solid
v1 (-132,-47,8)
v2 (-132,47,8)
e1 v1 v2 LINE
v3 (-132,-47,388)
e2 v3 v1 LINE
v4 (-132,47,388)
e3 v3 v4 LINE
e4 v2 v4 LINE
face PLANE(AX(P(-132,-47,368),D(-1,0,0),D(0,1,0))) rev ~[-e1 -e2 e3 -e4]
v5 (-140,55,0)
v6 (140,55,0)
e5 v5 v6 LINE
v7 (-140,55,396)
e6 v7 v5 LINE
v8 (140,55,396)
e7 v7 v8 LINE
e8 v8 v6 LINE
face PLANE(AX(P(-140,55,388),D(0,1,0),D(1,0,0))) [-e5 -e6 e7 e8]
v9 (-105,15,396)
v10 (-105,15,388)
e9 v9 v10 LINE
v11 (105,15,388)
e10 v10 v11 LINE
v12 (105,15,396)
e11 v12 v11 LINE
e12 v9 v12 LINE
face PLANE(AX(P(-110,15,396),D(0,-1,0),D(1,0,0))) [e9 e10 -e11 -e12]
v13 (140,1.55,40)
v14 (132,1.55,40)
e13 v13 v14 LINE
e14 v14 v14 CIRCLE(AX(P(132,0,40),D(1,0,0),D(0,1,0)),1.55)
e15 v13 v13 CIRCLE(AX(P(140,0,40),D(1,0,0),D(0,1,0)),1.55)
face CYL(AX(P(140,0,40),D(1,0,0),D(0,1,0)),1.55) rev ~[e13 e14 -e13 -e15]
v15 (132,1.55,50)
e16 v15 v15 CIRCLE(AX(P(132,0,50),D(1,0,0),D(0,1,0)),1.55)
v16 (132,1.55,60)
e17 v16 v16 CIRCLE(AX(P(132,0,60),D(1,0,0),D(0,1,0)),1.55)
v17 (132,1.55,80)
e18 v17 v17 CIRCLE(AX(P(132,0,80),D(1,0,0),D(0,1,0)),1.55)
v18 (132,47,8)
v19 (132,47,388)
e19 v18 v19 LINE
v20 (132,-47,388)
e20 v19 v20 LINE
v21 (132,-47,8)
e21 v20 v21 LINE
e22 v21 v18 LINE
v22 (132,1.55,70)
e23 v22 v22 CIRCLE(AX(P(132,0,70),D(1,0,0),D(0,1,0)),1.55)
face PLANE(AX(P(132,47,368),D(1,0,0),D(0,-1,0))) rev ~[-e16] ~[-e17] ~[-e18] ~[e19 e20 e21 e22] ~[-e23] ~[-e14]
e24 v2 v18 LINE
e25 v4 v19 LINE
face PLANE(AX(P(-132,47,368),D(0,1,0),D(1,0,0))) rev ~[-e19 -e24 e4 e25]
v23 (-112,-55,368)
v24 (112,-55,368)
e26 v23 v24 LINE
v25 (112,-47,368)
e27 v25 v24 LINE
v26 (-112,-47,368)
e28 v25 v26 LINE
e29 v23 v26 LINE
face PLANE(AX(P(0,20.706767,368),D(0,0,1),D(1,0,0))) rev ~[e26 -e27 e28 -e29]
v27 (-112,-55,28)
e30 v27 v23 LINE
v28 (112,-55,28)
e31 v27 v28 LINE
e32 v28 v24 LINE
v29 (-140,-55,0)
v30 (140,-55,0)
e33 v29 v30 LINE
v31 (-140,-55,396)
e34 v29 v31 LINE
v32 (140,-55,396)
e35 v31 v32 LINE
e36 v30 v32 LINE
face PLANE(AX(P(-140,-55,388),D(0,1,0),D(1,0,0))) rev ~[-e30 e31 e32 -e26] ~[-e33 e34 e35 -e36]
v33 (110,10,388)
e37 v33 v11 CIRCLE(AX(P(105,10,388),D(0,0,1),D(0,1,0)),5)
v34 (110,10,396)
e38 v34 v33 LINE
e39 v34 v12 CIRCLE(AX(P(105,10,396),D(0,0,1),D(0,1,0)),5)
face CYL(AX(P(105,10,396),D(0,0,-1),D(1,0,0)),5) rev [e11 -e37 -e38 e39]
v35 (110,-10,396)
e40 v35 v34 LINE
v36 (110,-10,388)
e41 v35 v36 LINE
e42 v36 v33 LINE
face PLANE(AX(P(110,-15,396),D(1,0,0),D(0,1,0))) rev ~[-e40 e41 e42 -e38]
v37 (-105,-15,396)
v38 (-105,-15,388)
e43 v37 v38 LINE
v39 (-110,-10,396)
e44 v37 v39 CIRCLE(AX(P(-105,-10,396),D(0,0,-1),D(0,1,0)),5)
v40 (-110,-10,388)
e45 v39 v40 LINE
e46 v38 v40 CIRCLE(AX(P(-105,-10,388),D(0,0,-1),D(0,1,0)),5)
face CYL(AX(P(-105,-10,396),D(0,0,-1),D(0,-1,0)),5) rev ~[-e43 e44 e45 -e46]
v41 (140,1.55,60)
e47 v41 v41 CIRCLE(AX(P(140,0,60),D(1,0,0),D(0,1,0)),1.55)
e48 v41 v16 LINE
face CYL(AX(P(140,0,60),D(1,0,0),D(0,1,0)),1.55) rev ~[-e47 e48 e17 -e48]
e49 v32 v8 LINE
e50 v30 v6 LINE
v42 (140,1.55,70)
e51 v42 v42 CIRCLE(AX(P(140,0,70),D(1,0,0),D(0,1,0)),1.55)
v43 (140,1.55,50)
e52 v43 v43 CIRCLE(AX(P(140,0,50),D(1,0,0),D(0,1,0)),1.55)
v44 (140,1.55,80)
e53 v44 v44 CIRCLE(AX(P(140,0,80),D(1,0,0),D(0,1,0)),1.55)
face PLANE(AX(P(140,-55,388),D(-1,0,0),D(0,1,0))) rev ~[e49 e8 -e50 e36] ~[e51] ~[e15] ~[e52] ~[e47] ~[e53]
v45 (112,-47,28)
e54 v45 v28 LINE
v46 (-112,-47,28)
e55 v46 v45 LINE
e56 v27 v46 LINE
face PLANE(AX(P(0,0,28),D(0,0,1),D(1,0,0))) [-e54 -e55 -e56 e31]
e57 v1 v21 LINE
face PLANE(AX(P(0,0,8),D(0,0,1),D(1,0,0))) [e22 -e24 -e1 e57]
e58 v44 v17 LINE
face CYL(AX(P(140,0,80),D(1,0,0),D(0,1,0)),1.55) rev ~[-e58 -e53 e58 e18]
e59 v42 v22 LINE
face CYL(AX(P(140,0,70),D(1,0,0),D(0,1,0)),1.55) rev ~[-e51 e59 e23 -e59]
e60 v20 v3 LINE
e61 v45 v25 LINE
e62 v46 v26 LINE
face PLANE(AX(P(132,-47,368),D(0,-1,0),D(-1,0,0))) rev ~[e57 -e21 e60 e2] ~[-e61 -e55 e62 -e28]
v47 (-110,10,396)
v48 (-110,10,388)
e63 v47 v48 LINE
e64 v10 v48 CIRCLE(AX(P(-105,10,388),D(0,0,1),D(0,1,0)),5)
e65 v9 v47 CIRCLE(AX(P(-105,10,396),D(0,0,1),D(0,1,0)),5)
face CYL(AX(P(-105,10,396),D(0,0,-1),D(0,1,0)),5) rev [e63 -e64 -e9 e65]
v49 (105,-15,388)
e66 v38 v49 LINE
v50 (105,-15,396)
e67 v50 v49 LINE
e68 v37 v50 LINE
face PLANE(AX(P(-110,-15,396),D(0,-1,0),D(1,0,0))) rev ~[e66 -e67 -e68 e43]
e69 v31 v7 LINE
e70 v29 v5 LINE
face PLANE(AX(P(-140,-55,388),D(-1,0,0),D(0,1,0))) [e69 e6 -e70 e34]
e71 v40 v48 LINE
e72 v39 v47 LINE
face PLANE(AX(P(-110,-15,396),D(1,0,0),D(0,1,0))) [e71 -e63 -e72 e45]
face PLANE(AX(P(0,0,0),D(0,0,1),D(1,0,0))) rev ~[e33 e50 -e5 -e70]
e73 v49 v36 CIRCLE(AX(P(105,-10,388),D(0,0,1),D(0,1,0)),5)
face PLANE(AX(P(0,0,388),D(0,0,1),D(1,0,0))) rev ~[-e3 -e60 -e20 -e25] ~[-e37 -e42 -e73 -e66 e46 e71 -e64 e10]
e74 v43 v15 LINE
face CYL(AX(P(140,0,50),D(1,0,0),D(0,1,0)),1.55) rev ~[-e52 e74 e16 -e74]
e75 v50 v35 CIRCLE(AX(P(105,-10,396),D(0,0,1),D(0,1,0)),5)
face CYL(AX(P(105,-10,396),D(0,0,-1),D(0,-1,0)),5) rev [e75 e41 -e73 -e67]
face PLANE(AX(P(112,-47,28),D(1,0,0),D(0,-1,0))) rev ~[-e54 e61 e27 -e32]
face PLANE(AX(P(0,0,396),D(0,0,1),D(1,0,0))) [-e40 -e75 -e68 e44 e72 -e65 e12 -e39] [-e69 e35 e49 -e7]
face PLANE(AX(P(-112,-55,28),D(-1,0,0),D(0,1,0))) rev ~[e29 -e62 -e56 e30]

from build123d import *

# Parameters (mm, degrees)
F0_W      = 280
F0_H      = 110
F1_DEPTH  = 8
F2_W      = 280
F2_H      = 110
F2_W_2    = 264
F2_H_2    = 94
F3_DEPTH  = 20
F5_DEPTH  = 340
F6_W      = 224
F6_H      = 8
F7_DEPTH  = 20
F8_W      = 280
F8_H      = 110
F8_W_2    = 264
F8_H_2    = 94
F9_DEPTH  = 8
F10_R     = 1.55
F11_DEPTH = 8
F12_W     = 220
F12_H     = 30
F13_DEPTH = 8
F14_R     = 5


# Not quite as in the source:
# - a feature names something its author has since deleted; it is built from what else it names


with BuildPart() as f1:
    # F0 (on Top) → F1 (new body)
    with BuildSketch(Plane.XY):
        Rectangle(F0_W, F0_H)
    extrude(amount=F1_DEPTH)

    # F2 (on face) → F3 (join)
    with BuildSketch(Plane.XY.offset(8)):
        Rectangle(F2_W, F2_H)
        Rectangle(F2_W_2, F2_H_2, mode=Mode.SUBTRACT)
    extrude(amount=F3_DEPTH)

    # F4 (on face) → F5 (join)
    with BuildSketch(Plane.XY.offset(28)):
        Polygon((-132, -47), (-132, 47), (132, 47), (132, -47), (112, -47), (112, -55), (140, -55), (140, 55), (-140, 55), (-140, -55), (-112, -55), (-112, -47), align=None)
    extrude(amount=F5_DEPTH)

    # F6 (on face) → F7 (join)
    with BuildSketch(Plane.XY.offset(368)):
        Polygon((-112, -47), (-132, -47), (-132, 47), (132, 47), (132, -47), (112, -47), (112, -55), (140, -55), (140, 55), (-140, 55), (-140, -55), (-112, -55), align=None)
        with Locations((0, -51)):
            Rectangle(F6_W, F6_H)
    extrude(amount=F7_DEPTH)

    # F8 (on face) → F9 (join)
    with BuildSketch(Plane.XY.offset(388)):
        Rectangle(F8_W, F8_H)
        Rectangle(F8_W_2, F8_H_2, mode=Mode.SUBTRACT)
        Rectangle(F8_W_2, F8_H_2)
    extrude(amount=F9_DEPTH)

    # F10 (on face) → F11 (cut, through all)
    with BuildSketch(Plane.YZ.offset(140)):
        with Locations((0, 80)):
            Circle(F10_R)
        with Locations((0, 70)):
            Circle(F10_R)
        with Locations((0, 50)):
            Circle(F10_R)
        with Locations((0, 40)):
            Circle(F10_R)
        with Locations((0, 60)):
            Circle(F10_R)
    extrude(amount=-F11_DEPTH, mode=Mode.SUBTRACT)

    # F12 (on face) → F13 (cut, through all)
    with BuildSketch(Plane.XY.offset(396)):
        Rectangle(F12_W, F12_H)
    extrude(amount=-F13_DEPTH, mode=Mode.SUBTRACT)

    # F14
    f14_edges = [f1.edges().sort_by_distance(p)[0] for p in [
        (-110, 15, 392),
        (-110, -15, 392),
        (110, -15, 392),
        (110, 15, 392),
    ]]
    fillet(f14_edges, radius=F14_R)


solid = f1.part
